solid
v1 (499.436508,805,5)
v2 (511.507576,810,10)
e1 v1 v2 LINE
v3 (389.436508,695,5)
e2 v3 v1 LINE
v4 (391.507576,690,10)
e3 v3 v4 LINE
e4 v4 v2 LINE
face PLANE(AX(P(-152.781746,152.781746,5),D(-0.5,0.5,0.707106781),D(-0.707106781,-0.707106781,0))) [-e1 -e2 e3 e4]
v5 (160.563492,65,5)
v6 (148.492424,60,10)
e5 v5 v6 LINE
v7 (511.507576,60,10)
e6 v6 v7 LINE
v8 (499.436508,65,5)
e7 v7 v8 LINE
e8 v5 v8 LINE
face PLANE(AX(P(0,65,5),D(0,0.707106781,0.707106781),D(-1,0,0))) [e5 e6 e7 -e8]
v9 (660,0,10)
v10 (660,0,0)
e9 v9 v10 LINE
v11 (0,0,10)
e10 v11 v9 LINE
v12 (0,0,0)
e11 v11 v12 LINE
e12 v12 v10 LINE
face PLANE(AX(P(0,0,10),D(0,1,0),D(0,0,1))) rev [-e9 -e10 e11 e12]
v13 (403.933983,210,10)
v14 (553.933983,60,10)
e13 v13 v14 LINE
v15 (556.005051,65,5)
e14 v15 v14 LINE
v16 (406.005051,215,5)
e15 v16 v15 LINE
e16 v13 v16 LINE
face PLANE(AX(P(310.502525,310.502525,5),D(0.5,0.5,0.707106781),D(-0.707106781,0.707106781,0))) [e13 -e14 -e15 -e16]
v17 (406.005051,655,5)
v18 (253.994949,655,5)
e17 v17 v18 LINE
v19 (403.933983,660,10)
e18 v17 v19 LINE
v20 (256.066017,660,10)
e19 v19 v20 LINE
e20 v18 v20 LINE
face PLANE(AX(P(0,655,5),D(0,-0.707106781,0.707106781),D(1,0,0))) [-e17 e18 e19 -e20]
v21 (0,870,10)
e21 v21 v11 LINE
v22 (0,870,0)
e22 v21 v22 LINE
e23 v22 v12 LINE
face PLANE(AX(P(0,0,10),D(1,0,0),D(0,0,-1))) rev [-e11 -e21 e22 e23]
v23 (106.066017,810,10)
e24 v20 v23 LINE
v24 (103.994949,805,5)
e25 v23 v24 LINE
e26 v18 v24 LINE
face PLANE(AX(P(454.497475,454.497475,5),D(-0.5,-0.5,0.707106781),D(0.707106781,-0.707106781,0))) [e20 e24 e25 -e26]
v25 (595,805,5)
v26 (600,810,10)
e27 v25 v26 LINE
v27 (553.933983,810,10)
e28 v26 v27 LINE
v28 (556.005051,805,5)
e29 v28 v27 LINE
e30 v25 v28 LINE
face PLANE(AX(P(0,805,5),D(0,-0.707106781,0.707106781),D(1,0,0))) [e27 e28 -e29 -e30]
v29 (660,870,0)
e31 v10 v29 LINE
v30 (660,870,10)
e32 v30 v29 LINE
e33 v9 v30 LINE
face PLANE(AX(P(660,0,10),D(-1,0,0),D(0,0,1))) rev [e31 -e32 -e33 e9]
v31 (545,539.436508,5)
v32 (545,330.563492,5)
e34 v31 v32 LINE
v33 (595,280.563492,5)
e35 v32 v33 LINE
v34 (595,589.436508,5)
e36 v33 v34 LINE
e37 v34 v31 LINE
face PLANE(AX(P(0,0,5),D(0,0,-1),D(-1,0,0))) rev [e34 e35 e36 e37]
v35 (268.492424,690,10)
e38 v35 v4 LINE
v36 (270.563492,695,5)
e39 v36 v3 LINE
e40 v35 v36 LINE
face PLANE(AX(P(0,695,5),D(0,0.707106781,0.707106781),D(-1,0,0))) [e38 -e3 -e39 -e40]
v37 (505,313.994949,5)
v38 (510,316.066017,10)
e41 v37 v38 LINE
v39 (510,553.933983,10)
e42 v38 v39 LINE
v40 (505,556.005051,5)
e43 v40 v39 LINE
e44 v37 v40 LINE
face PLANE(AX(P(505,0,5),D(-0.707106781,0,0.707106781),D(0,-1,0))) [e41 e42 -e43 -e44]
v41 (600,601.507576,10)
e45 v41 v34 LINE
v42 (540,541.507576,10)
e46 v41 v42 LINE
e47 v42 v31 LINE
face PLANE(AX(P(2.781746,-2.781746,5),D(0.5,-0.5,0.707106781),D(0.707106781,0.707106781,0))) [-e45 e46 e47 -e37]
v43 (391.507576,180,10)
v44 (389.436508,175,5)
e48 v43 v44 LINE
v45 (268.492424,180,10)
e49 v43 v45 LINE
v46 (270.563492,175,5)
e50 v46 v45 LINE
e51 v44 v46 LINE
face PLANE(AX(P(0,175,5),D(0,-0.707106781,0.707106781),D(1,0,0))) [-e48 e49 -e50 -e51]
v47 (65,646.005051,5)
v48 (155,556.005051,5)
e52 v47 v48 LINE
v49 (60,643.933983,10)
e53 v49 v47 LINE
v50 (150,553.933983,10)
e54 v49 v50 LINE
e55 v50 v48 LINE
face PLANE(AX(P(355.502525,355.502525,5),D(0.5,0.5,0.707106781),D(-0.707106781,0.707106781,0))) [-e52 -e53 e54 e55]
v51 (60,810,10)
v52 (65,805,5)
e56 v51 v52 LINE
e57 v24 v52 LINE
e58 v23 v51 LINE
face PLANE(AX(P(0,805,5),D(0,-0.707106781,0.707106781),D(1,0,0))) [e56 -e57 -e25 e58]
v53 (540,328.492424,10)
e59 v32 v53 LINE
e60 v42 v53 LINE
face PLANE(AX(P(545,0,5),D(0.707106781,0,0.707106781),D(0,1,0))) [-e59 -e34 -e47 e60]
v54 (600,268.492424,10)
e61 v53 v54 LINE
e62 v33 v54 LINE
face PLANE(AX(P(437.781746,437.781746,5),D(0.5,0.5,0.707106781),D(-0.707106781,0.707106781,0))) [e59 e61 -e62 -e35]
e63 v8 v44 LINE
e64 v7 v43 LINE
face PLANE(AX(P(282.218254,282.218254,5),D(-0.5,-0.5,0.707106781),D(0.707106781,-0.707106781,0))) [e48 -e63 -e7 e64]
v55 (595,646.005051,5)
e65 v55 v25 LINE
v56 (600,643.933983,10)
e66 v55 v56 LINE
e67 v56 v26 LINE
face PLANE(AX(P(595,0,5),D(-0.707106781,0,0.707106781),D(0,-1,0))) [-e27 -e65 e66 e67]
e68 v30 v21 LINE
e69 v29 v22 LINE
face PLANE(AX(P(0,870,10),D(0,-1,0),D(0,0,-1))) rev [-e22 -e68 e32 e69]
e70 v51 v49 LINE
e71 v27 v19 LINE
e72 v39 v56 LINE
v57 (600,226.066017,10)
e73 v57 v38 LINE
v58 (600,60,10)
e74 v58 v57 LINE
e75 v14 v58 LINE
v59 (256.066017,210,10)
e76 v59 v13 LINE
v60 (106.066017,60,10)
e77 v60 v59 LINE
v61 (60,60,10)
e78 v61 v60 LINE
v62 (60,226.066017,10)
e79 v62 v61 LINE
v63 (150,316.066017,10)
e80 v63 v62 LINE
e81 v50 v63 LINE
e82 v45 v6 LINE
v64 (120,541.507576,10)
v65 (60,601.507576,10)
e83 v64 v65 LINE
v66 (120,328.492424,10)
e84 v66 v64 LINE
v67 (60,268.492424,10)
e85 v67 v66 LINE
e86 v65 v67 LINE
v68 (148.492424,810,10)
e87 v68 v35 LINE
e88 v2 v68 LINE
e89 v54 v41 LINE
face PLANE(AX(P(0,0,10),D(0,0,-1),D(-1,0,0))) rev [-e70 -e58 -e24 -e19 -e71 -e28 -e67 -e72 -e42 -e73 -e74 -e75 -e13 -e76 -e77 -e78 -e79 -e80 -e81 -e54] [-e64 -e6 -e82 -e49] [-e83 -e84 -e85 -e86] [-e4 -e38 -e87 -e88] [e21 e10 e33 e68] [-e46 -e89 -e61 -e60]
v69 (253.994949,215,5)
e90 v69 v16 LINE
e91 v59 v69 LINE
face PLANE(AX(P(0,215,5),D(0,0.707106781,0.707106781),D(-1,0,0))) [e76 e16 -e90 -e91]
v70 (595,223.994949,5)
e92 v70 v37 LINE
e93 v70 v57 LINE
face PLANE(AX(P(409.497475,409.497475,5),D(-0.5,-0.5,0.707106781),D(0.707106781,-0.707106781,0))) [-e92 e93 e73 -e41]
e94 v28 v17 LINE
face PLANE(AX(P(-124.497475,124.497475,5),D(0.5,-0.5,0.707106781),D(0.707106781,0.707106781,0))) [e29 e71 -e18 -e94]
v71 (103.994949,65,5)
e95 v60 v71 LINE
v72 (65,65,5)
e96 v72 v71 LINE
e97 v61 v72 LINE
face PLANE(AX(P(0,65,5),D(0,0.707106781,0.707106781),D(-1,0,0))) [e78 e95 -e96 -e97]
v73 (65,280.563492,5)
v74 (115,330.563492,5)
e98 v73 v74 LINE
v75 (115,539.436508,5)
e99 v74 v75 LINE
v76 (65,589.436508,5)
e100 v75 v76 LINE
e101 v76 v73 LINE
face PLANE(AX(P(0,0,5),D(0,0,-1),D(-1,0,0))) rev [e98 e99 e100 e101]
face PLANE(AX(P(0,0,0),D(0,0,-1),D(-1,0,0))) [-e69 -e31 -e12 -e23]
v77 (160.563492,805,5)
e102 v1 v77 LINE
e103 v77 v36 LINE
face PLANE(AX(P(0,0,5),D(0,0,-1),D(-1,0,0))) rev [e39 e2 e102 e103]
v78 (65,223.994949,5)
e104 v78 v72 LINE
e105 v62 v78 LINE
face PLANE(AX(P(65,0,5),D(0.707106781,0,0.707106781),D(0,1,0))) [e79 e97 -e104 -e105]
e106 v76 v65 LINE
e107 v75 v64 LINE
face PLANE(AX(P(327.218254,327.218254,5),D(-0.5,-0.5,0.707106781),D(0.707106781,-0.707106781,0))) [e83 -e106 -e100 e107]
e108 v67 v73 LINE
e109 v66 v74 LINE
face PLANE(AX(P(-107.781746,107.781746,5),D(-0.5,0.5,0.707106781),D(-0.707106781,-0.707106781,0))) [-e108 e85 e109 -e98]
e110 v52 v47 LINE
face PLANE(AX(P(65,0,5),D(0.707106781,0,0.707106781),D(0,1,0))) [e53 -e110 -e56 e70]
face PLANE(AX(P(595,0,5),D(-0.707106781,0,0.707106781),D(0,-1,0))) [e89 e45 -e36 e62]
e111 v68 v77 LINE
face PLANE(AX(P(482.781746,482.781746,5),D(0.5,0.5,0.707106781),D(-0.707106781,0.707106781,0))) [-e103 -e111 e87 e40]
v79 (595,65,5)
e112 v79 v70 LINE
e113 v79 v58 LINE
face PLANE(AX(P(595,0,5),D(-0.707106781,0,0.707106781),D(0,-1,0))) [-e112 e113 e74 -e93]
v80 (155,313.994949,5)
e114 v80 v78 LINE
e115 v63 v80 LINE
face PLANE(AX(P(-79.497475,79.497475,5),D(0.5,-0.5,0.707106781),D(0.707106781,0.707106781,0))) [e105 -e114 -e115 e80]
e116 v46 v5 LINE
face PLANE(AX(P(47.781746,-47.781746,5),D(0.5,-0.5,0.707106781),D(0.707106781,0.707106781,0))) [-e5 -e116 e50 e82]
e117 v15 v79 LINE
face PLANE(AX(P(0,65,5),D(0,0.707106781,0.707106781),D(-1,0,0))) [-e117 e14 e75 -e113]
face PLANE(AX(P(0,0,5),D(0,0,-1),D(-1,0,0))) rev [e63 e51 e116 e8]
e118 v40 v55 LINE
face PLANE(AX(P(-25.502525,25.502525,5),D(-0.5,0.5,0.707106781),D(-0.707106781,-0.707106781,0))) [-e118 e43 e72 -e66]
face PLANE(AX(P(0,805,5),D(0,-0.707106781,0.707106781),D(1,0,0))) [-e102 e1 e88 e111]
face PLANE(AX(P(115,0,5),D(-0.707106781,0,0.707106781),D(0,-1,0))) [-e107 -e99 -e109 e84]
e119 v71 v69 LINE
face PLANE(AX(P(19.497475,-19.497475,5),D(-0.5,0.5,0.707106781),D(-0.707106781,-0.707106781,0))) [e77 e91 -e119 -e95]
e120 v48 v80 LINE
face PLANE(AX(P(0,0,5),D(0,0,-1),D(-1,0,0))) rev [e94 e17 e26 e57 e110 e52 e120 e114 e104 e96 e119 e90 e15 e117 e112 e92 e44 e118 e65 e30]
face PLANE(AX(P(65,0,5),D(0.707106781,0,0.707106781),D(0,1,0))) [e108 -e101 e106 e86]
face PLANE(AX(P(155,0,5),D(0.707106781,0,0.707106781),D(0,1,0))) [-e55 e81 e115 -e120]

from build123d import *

# Parameters (mm, degrees)
ESQUISSE1_W             = 660
ESQUISSE1_H             = 870
BOSS_EXTRU_1_DEPTH      = 10
ENL_V_MAT_EXTRU_1_DEPTH = 5
CHANFREIN1_SIZE         = 5


with BuildPart() as part:
    # Esquisse1 → Boss.-Extru.1 (new body)
    with BuildSketch(Plane.XY):
        with Locations((330, 435)):
            Rectangle(ESQUISSE1_W, ESQUISSE1_H)
    extrude(amount=BOSS_EXTRU_1_DEPTH)

    # Esquisse2 → Enlèv. mat.-Extru.1 (cut)
    with BuildSketch(Plane.XY.offset(10)):
        Polygon((120, 328.492424049), (120, 541.507575951), (60, 601.507575951), (60, 268.492424049), align=None)
        Polygon((268.492424049, 690), (391.507575951, 690), (511.507575951, 810), (148.492424049, 810), align=None)
        Polygon((60, 810), (60, 643.933982822), (150, 553.933982822), (150, 316.066017178), (60, 226.066017178), (60, 60), (106.066017178, 60), (256.066017178, 210), (403.933982822, 210), (553.933982822, 60), (600, 60), (600, 226.066017178), (510, 316.066017178), (510, 553.933982822), (600, 643.933982822), (600, 810), (553.933982822, 810), (403.933982822, 660), (256.066017178, 660), (106.066017178, 810), align=None)
        Polygon((540, 328.492424049), (540, 541.507575951), (600, 601.507575951), (600, 268.492424049), align=None)
        Polygon((511.507575951, 60), (148.492424049, 60), (268.492424049, 180), (391.507575951, 180), align=None)
    extrude(amount=-ENL_V_MAT_EXTRU_1_DEPTH, mode=Mode.SUBTRACT)

    # Chanfrein1
    chanfrein1_edges = [part.edges().sort_by_distance(p)[0] for p in [
        (330, 60, 5),
        (208.492424049, 120, 5),
        (330, 180, 5),
        (451.507575951, 120, 5),
        (60, 435, 5),
        (90, 571.507575951, 5),
        (120, 435, 5),
        (90, 298.492424049, 5),
        (600, 435, 5),
        (570, 298.492424049, 5),
        (540, 435, 5),
        (570, 571.507575951, 5),
        (181.066017178, 735, 5),
        (330, 660, 5),
        (478.933982822, 735, 5),
        (576.966991411, 810, 5),
        (600, 726.966991411, 5),
        (555, 598.933982822, 5),
        (510, 435, 5),
        (555, 271.066017178, 5),
        (600, 143.033008589, 5),
        (576.966991411, 60, 5),
        (478.933982822, 135, 5),
        (330, 210, 5),
        (181.066017178, 135, 5),
        (83.033008589, 60, 5),
        (60, 143.033008589, 5),
        (105, 271.066017178, 5),
        (150, 435, 5),
        (105, 598.933982822, 5),
        (60, 726.966991411, 5),
        (83.033008589, 810, 5),
        (330, 810, 5),
        (451.507575951, 750, 5),
        (330, 690, 5),
        (208.492424049, 750, 5),
    ]]
    chamfer(chanfrein1_edges, length=CHANFREIN1_SIZE - 0.0001)  # a hair under: the kernel refuses the full size


solid = part.part
